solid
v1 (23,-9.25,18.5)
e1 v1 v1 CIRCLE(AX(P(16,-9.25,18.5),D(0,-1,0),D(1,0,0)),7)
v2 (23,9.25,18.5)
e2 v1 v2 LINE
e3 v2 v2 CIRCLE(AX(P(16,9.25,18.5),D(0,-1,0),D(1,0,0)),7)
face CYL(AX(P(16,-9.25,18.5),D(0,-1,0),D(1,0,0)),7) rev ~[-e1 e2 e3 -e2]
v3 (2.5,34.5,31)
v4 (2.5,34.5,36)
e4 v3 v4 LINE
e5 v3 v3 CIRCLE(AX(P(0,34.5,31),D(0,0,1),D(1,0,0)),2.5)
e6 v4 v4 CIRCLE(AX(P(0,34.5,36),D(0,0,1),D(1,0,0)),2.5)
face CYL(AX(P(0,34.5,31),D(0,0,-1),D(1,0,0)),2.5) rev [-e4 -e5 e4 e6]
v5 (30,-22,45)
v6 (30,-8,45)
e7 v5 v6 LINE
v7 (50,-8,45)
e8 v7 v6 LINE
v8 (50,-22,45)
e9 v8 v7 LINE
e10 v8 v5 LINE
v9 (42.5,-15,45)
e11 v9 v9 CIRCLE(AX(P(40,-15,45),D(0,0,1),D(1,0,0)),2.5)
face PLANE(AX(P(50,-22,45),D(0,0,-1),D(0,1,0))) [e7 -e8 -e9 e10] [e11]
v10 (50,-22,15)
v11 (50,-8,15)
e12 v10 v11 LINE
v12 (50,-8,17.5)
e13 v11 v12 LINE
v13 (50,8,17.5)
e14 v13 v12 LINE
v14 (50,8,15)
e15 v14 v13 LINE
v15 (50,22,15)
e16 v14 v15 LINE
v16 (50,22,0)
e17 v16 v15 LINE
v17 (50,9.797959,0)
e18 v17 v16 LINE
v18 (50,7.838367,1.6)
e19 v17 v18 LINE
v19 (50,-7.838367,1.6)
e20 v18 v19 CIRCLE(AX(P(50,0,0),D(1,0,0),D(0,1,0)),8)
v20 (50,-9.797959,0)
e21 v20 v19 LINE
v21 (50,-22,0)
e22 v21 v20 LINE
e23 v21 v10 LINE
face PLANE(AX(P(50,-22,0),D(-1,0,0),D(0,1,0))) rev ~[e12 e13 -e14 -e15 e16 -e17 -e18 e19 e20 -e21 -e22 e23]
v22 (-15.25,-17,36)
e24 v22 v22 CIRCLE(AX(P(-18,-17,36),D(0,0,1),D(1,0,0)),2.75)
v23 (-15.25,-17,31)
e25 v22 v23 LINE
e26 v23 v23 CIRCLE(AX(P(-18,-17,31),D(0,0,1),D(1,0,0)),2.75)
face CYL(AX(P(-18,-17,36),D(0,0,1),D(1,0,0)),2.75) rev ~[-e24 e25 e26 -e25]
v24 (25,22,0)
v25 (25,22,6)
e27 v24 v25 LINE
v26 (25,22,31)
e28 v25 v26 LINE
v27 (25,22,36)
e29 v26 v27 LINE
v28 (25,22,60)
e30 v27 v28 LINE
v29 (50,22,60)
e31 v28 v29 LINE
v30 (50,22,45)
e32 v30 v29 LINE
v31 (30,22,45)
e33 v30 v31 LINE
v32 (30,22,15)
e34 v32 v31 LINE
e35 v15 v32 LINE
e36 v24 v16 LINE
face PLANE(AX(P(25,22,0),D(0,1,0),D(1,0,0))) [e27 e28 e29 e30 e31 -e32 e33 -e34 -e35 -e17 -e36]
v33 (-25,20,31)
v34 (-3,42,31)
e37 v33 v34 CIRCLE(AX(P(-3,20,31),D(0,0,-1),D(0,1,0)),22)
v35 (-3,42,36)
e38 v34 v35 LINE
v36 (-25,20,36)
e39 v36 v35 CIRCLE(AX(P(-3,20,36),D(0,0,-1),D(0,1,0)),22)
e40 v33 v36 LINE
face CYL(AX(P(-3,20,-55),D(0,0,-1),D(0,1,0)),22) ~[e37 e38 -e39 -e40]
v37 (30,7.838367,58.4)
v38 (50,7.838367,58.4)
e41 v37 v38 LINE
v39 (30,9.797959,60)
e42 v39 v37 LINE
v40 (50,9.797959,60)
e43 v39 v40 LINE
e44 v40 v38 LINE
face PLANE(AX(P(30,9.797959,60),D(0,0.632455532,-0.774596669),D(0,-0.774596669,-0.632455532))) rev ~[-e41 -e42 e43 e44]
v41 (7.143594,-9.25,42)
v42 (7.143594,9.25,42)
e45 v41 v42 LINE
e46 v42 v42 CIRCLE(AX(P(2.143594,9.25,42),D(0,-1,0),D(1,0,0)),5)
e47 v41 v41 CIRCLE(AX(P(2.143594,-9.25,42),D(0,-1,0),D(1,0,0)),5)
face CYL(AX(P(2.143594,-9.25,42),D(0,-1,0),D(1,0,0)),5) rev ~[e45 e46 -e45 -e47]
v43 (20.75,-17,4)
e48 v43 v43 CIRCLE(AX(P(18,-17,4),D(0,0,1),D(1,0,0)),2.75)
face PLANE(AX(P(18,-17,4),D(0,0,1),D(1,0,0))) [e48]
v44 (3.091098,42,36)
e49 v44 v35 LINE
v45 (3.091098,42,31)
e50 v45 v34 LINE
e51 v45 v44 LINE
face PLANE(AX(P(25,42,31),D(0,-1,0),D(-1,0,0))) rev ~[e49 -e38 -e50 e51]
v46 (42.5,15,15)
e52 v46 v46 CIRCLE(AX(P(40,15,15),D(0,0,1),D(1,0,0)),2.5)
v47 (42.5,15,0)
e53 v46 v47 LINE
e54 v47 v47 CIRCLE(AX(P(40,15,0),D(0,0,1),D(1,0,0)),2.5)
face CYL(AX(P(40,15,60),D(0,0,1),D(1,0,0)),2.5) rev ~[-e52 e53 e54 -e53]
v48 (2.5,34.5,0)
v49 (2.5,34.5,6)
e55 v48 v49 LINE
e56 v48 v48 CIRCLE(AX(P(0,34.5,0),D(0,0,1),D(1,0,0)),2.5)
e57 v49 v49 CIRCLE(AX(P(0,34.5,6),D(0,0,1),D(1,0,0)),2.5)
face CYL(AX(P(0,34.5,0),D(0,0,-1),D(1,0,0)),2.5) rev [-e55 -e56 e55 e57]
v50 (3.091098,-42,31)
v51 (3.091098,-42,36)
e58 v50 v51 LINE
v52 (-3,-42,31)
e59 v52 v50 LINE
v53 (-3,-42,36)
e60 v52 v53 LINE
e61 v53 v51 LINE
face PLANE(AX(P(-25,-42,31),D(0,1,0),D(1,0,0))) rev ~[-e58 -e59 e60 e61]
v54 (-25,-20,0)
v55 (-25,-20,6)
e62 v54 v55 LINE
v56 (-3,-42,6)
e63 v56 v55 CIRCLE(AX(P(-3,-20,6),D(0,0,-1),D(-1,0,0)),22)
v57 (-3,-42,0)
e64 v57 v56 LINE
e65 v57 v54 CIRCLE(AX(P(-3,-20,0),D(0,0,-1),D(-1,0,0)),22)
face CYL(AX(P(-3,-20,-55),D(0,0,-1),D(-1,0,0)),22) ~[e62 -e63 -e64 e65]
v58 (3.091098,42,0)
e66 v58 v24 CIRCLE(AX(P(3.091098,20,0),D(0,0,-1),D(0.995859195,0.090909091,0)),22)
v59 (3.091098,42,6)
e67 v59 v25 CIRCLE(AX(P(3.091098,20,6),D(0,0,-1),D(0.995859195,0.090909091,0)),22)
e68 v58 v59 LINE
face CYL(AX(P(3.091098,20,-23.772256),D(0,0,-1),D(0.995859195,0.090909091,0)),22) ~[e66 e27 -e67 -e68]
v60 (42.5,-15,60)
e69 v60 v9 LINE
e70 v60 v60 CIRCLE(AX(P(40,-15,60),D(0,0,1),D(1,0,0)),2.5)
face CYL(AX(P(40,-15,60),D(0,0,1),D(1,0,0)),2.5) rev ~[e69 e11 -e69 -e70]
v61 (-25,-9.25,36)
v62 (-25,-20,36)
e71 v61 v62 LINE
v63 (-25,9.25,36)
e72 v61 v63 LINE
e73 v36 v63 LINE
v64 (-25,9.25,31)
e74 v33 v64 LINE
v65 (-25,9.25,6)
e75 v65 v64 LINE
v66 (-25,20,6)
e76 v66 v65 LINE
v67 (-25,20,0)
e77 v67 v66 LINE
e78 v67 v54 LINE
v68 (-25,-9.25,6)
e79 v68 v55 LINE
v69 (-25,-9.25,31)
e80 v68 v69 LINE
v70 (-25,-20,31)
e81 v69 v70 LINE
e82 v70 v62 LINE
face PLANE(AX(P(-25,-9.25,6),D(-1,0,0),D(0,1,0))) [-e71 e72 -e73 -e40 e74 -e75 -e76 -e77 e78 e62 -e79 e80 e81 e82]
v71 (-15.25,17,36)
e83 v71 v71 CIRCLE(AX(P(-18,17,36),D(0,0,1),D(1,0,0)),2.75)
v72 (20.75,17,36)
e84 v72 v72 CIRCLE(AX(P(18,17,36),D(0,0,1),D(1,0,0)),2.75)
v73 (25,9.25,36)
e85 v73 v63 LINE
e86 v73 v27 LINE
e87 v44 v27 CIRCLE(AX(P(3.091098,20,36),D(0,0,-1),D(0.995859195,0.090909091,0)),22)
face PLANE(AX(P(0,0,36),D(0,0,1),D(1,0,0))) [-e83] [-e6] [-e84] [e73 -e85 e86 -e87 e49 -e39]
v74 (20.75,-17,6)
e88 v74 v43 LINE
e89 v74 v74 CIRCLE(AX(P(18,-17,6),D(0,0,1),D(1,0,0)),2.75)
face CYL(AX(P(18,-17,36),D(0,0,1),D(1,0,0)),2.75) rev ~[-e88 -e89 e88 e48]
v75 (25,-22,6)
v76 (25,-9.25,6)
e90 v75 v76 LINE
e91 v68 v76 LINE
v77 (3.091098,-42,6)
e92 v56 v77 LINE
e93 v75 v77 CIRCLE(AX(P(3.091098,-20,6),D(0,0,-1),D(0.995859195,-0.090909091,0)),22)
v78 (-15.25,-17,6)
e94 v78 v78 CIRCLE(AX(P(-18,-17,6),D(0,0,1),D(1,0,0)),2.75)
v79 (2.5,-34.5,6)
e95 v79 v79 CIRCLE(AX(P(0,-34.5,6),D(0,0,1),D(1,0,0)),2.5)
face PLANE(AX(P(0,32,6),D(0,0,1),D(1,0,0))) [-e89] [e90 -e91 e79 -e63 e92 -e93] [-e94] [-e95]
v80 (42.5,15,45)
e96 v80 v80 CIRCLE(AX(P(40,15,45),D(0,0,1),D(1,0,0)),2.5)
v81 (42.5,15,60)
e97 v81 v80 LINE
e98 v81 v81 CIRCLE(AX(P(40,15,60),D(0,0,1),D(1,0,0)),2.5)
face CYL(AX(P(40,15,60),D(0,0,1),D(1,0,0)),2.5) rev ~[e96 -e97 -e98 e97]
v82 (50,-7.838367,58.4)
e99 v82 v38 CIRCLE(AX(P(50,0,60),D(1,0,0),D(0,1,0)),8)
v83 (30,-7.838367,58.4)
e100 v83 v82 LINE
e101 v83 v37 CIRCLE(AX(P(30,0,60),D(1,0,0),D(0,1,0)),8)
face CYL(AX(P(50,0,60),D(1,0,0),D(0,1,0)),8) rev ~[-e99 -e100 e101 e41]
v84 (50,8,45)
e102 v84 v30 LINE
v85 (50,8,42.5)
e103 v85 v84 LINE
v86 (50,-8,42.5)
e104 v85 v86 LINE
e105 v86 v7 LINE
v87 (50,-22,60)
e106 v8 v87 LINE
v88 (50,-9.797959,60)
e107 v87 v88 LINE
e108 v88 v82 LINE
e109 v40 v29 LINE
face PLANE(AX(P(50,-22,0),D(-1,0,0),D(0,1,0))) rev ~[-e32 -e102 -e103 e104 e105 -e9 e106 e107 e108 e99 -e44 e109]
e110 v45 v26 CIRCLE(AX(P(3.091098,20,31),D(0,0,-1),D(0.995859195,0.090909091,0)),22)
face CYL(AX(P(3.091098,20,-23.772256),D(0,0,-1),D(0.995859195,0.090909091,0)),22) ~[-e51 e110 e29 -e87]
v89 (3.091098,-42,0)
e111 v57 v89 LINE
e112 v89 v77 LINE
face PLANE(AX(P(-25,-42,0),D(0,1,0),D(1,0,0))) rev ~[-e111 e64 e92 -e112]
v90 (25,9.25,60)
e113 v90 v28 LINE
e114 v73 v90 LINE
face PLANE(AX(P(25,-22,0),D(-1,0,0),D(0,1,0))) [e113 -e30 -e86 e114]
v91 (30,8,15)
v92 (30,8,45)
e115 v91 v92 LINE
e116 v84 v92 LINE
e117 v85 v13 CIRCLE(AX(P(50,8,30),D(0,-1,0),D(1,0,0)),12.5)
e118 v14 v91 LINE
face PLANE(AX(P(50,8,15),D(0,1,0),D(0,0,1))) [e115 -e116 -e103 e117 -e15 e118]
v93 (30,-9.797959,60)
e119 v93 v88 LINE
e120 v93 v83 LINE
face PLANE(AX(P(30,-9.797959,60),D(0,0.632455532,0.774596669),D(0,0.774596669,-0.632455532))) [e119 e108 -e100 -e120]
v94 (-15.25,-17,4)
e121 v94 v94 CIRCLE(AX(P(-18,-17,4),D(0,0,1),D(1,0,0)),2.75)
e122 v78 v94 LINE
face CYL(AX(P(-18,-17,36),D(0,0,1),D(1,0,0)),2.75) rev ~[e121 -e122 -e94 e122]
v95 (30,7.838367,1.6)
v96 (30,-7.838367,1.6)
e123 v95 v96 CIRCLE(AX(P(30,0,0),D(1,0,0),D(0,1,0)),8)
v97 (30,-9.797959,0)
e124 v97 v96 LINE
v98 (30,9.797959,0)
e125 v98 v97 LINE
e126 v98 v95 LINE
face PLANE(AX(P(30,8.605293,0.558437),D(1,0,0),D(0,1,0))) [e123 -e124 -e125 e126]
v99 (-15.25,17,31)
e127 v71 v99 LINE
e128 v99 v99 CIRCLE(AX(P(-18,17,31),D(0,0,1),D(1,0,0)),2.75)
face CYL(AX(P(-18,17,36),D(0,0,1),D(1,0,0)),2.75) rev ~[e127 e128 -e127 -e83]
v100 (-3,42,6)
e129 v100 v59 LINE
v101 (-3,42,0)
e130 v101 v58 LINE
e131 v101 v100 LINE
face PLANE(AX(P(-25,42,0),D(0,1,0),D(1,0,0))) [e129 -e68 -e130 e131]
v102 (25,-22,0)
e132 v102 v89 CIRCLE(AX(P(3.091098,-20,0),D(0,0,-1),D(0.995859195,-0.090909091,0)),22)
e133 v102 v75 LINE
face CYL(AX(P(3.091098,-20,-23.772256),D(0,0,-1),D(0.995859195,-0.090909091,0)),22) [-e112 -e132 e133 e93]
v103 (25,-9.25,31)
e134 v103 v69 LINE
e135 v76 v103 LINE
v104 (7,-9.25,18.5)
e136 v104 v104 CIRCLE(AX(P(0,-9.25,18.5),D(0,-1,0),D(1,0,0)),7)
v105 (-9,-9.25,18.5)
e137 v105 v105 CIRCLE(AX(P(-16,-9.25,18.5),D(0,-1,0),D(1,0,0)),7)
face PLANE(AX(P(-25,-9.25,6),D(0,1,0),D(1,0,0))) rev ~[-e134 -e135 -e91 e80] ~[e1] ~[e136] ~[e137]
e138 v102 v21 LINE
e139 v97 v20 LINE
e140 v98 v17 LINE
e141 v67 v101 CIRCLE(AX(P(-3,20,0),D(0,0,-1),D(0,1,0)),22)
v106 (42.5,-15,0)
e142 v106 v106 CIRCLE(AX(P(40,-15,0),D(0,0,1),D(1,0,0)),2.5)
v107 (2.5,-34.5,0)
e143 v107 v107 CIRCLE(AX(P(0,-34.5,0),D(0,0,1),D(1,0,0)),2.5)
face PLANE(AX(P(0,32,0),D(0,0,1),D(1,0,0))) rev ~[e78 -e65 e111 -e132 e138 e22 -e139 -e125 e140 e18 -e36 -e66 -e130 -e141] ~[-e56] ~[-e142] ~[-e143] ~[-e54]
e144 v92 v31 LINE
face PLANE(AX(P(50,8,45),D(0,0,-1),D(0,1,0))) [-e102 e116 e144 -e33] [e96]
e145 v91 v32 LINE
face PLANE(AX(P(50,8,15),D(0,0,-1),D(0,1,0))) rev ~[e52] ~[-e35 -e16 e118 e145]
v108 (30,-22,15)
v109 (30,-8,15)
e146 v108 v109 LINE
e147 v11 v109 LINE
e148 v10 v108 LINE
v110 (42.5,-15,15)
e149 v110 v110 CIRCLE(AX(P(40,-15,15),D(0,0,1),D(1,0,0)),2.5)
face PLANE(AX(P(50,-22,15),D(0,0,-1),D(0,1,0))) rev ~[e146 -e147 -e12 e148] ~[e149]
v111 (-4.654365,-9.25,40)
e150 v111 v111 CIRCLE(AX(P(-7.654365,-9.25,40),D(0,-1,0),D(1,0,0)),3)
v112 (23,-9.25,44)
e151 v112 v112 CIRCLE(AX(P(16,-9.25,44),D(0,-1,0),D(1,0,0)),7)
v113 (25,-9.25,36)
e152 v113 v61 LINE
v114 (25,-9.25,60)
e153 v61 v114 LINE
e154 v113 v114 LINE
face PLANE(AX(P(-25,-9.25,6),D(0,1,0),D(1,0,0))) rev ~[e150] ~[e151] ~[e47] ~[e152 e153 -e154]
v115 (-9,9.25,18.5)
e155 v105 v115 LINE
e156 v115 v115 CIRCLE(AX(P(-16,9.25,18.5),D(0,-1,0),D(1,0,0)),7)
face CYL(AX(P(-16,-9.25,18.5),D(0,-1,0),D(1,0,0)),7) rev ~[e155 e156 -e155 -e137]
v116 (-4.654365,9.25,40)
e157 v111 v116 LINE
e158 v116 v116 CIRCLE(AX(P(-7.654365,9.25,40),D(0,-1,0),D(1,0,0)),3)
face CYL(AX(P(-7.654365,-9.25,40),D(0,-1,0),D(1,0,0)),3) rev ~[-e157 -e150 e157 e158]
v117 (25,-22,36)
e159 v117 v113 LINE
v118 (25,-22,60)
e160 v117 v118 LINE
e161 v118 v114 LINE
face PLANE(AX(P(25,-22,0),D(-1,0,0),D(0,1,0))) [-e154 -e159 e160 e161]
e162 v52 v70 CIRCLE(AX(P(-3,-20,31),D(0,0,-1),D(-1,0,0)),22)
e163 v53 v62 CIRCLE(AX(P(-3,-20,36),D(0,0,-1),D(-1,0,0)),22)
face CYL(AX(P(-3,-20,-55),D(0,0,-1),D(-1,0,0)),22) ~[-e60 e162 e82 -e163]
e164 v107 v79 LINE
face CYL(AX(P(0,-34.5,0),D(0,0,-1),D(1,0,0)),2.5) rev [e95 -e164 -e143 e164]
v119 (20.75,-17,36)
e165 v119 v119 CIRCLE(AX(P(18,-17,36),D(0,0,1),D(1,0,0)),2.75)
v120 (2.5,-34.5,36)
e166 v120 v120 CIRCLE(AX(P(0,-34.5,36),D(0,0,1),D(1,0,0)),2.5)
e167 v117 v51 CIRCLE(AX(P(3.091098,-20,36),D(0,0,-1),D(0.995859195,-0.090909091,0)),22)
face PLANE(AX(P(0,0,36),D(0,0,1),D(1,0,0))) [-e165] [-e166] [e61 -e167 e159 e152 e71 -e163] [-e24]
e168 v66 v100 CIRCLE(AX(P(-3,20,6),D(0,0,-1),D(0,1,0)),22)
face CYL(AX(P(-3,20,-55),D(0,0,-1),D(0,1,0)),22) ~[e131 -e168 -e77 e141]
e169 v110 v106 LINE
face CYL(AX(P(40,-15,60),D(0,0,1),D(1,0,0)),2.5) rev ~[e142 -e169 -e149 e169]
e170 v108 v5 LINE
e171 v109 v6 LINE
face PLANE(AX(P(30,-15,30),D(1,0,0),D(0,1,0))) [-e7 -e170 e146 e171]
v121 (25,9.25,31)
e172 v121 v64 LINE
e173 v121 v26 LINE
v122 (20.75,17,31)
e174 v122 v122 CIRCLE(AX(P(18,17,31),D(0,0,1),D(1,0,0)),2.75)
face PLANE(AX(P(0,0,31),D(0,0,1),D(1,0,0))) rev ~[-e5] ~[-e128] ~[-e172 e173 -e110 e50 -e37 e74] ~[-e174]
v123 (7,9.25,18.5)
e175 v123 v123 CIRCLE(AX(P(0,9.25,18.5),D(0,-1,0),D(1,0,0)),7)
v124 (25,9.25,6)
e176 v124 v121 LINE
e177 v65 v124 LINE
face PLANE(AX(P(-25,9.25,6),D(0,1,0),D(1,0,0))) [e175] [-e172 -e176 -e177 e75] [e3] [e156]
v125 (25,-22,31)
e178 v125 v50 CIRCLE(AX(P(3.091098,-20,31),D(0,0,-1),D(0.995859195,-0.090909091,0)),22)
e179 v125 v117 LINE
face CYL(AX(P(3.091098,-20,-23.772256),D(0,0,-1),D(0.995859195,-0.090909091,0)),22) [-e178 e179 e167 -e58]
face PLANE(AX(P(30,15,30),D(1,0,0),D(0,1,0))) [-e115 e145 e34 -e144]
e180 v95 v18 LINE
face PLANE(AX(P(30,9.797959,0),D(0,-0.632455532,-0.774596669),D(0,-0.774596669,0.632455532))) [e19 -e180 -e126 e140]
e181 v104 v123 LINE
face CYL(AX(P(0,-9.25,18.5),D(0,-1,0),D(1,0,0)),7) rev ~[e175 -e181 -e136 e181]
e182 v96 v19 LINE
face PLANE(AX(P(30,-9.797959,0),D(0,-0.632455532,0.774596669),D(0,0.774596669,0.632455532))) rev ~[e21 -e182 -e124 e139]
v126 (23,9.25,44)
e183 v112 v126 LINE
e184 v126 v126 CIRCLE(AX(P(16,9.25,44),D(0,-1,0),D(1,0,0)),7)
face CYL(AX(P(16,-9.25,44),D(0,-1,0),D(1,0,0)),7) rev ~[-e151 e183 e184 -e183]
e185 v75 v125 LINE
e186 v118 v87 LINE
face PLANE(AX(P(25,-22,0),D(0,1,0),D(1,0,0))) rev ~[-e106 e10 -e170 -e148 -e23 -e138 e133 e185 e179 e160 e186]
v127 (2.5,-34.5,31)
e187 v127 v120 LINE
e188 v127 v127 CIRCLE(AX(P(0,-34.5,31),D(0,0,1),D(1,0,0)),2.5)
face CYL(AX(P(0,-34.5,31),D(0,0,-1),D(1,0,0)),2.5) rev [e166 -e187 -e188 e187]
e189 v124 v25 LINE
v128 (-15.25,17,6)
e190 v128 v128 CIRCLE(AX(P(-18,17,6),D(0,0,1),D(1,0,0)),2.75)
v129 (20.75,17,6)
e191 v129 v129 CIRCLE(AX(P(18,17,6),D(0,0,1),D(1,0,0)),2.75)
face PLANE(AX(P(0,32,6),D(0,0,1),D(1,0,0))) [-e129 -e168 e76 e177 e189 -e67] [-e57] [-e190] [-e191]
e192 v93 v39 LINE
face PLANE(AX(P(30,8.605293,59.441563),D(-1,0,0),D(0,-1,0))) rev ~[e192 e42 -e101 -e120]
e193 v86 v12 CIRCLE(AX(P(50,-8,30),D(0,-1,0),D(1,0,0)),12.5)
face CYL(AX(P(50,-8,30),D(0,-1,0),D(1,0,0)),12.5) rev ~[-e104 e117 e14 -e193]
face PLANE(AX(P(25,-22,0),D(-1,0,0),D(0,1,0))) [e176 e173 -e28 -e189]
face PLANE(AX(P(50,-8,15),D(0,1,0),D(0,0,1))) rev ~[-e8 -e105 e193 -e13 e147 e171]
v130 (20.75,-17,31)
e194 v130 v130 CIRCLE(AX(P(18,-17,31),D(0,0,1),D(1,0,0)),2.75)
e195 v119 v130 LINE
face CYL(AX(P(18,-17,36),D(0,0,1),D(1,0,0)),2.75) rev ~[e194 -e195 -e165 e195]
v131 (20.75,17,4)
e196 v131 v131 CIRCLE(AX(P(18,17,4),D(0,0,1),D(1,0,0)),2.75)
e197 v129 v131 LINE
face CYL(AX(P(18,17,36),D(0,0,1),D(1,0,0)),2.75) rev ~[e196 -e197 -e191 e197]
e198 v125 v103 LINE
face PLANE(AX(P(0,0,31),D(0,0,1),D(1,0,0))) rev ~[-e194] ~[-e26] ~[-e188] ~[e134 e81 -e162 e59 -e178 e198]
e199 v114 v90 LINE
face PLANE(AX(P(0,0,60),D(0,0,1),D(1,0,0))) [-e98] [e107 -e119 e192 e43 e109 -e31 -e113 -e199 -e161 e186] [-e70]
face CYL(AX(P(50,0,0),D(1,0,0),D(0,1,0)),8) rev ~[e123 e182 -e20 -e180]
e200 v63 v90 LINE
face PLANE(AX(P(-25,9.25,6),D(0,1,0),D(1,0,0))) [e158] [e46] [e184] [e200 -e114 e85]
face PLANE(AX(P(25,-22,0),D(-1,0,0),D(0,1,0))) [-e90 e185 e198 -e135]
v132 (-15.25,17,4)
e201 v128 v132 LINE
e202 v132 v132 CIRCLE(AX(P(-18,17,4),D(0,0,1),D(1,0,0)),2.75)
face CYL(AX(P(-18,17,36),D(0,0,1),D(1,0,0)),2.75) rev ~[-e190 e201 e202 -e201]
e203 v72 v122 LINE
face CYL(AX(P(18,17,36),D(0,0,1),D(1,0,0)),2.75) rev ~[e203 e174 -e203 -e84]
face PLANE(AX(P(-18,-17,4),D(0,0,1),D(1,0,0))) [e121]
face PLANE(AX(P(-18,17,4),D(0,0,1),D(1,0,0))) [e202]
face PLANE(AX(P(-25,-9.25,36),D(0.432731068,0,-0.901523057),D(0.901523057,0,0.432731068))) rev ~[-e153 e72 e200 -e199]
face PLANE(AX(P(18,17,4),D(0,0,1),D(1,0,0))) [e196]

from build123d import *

# Parameters (mm, degrees)
F0_W         = 25
F0_H         = 44
F1_DEPTH     = 60
F0_W_2       = 50
F0_H_2       = 20
F0_R         = 2.5
F2_DEPTH     = 6
F3_R         = 8
F4_DEPTH     = 20
F5_R         = 2.5
F6_DEPTH     = 60
F7_W         = 14
F7_H         = 30
F8_DEPTH     = 20
F9_START     = 25
F2_FACE_R    = 2.5
F9_DEPTH     = 5
F10_T1_DEPTH = 114.544511501
F10_T3_DEPTH = 115.544511501
F10_T5_DEPTH = 116
F10_T7_DEPTH = 115
F11_R        = 2.75
F12_DEPTH    = 32
F13_W        = 50
F13_H        = 18.5
F14_DEPTH    = 54
F16_DEPTH    = 18.5
F17_R        = 12.5
F18_DEPTH    = 16.8
F19_R        = 7
F20_DEPTH    = 18.5
F21_R        = 7
F21_R_2      = 3
F21_R_3      = 5
F22_DEPTH    = 18.5
F23_T1_DEPTH = 24.6515369414


# Not quite as in the source:
# - a fillet or chamfer that OpenCascade refuses, or shapes differently, is made with other operations: its cross-section is extruded or revolved along the edge and cut away or added


with BuildPart() as f1:
    # F0 (on Top) → F1 (new body)
    with BuildSketch(Plane.XY):
        with Locations((37.5, 0)):
            Rectangle(F0_W, F0_H)
    extrude(amount=F1_DEPTH)

    # F0 (on Top) → F2 (join)
    with BuildSketch(Plane.XY):
        with Locations((0, 32)):
            Rectangle(F0_W_2, F0_H_2)
        with Locations((0, 34.5)):
            Circle(F0_R, mode=Mode.SUBTRACT)
        Rectangle(F0_W_2, F0_H)
        with Locations((0, -32)):
            Rectangle(F0_W_2, F0_H_2)
        with Locations((0, -34.5)):
            Circle(F0_R, mode=Mode.SUBTRACT)
    extrude(amount=F2_DEPTH)

    # F3 (on face) → F4 (cut)
    with BuildSketch(Plane.YZ.offset(50)):
        Circle(F3_R)
        with Locations((0, 60)):
            Circle(F3_R)
    extrude(amount=-F4_DEPTH, mode=Mode.SUBTRACT)

    # F5 (on face) → F6 (cut)
    with BuildSketch(Plane.XY.offset(60)):
        with Locations((40, 15)):
            Circle(F5_R)
        with Locations((40, -15)):
            Circle(F5_R)
    extrude(amount=-F6_DEPTH, mode=Mode.SUBTRACT)

    # F7 (on face) → F8 (cut)
    with BuildSketch(Plane.YZ.offset(50)):
        with Locations((-15, 30)):
            Rectangle(F7_W, F7_H)
        with Locations((15, 30)):
            Rectangle(F7_W, F7_H)
    extrude(amount=-F8_DEPTH, mode=Mode.SUBTRACT)

    # F2_face (on face) → F9 (join)
    with BuildSketch(Plane.XY.offset(6).offset(F9_START)):
        Polygon((-25, 42), (-25, -42), (25, -42), (25, -22), (25, 22), (25, 42), align=None)
        with Locations((0, 34.5)):
            Circle(F2_FACE_R, mode=Mode.SUBTRACT)
        with Locations((0, -34.5)):
            Circle(F2_FACE_R, mode=Mode.SUBTRACT)
    extrude(amount=F9_DEPTH)

    # F10: fillet of radius 22 on 8 edges, made by hand

    # F10_s2 → F10_t1 (cut)
    with BuildSketch(Plane.XY.offset(-23.7722557505)):
        with BuildLine():
            ThreePointArc((25, -22), (17.923494674, -36.2480768093), (3.0910976998, -42))
            Line((3.0910976998, -42), (25, -42))
            Line((25, -42), (25, -22))
        make_face()
        with BuildLine():
            ThreePointArc((25, 22), (17.923494674, 36.2480768093), (3.0910976998, 42))
            Line((3.0910976998, 42), (25, 42))
            Line((25, 42), (25, 22))
        make_face()
    extrude(amount=F10_T1_DEPTH, mode=Mode.SUBTRACT)

    # F10_s4 → F10_t3 (cut)
    with BuildSketch(Plane.XY.offset(-54.7722557505)):
        with BuildLine():
            ThreePointArc((3.0910976998, -42), (17.923494674, -36.2480768093), (25, -22))
            Line((25, -22), (25, -42))
            Line((25, -42), (3.0910976998, -42))
        make_face()
        with BuildLine():
            ThreePointArc((25, 22), (17.923494674, 36.2480768093), (3.0910976998, 42))
            Line((3.0910976998, 42), (25, 42))
            Line((25, 42), (25, 22))
        make_face()
    extrude(amount=F10_T3_DEPTH, mode=Mode.SUBTRACT)

    # F10_s6 → F10_t5 (cut)
    with BuildSketch(Plane.XY.offset(-55)):
        with BuildLine():
            ThreePointArc((-25, -20), (-18.5563491861, -35.5563491861), (-3, -42))
            Line((-3, -42), (-25, -42))
            Line((-25, -42), (-25, -20))
        make_face()
        with BuildLine():
            ThreePointArc((-3, 42), (-18.5563491861, 35.5563491861), (-25, 20))
            Line((-25, 20), (-25, 42))
            Line((-25, 42), (-3, 42))
        make_face()
    extrude(amount=F10_T5_DEPTH, mode=Mode.SUBTRACT)

    # F10_s8 → F10_t7 (cut)
    with BuildSketch(Plane.XY.offset(-24)):
        with BuildLine():
            ThreePointArc((-25, -20), (-18.5563491861, -35.5563491861), (-3, -42))
            Line((-3, -42), (-25, -42))
            Line((-25, -42), (-25, -20))
        make_face()
        with BuildLine():
            ThreePointArc((-3, 42), (-18.5563491861, 35.5563491861), (-25, 20))
            Line((-25, 20), (-25, 42))
            Line((-25, 42), (-3, 42))
        make_face()
    extrude(amount=F10_T7_DEPTH, mode=Mode.SUBTRACT)

    # F11 (on face) → F12 (cut)
    with BuildSketch(Plane.XY.offset(36)):
        with Locations((18, 17)):
            Circle(F11_R)
        with Locations((-18, 17)):
            Circle(F11_R)
        with Locations((-18, -17)):
            Circle(F11_R)
        with Locations((18, -17)):
            Circle(F11_R)
    extrude(amount=-F12_DEPTH, mode=Mode.SUBTRACT)

    # F13 (on face) → F14 (join)
    with BuildSketch(Plane.XY.offset(6)):
        Rectangle(F13_W, F13_H)
    extrude(amount=F14_DEPTH)

    # F15 (on face) → F16 (cut)
    with BuildSketch(Plane.XZ.offset(9.25)):
        Polygon((-25, 36), (25, 60), (-25, 60), align=None)
    extrude(amount=-F16_DEPTH, mode=Mode.SUBTRACT)

    # F17 (on face) → F18 (cut)
    with BuildSketch(Plane.XZ.offset(8)):
        with Locations((50, 30)):
            Circle(F17_R)
    extrude(amount=-F18_DEPTH, mode=Mode.SUBTRACT)

    # F19 (on face) → F20 (cut)
    with BuildSketch(Plane.XZ.offset(9.25)):
        with Locations((0, 18.5)):
            Circle(F19_R)
        with Locations((16, 18.5)):
            Circle(F19_R)
        with Locations((-16, 18.5)):
            Circle(F19_R)
    extrude(amount=-F20_DEPTH, mode=Mode.SUBTRACT)

    # F21 (on face) → F22 (cut)
    with BuildSketch(Plane.XZ.offset(9.25)):
        with Locations((16, 44)):
            Circle(F21_R)
        with Locations((-7.6543654317, 40)):
            Circle(F21_R_2)
        with Locations((2.1435935394, 42)):
            Circle(F21_R_3)
    extrude(amount=-F22_DEPTH, mode=Mode.SUBTRACT)

    # F23: chamfer of 2 on 4 edges, made by hand

    # F23_s2 → F23_t1 (cut)
    with BuildSketch(Plane.YZ.offset(30)):
        with BuildLine():
            Line((9.7979589711, 60), (7.8383671769, 58.4))
            ThreePointArc((7.8383671769, 58.4), (7.9565711479, 59.1675484588), (8, 60))
            Line((8, 60), (9.7979589711, 60))
        make_face()
        with BuildLine():
            Line((-9.7979589711, 60), (-7.8383671769, 58.4))
            ThreePointArc((-7.8383671769, 58.4), (-7.9565711479, 59.1675484588), (-8, 60))
            Line((-8, 60), (-9.7979589711, 60))
        make_face()
        with BuildLine():
            Line((9.7979589711, 0), (7.8383671769, 1.6))
            ThreePointArc((7.8383671769, 1.6), (7.9565711479, 0.8324515412), (8, 0))
            Line((8, 0), (9.7979589711, 0))
        make_face()
        with BuildLine():
            Line((-9.7979589711, 0), (-7.8383671769, 1.6))
            ThreePointArc((-7.8383671769, 1.6), (-7.9565711479, 0.8324515412), (-8, 0))
            Line((-8, 0), (-9.7979589711, 0))
        make_face()
    extrude(amount=F23_T1_DEPTH, mode=Mode.SUBTRACT)


solid = f1.part
